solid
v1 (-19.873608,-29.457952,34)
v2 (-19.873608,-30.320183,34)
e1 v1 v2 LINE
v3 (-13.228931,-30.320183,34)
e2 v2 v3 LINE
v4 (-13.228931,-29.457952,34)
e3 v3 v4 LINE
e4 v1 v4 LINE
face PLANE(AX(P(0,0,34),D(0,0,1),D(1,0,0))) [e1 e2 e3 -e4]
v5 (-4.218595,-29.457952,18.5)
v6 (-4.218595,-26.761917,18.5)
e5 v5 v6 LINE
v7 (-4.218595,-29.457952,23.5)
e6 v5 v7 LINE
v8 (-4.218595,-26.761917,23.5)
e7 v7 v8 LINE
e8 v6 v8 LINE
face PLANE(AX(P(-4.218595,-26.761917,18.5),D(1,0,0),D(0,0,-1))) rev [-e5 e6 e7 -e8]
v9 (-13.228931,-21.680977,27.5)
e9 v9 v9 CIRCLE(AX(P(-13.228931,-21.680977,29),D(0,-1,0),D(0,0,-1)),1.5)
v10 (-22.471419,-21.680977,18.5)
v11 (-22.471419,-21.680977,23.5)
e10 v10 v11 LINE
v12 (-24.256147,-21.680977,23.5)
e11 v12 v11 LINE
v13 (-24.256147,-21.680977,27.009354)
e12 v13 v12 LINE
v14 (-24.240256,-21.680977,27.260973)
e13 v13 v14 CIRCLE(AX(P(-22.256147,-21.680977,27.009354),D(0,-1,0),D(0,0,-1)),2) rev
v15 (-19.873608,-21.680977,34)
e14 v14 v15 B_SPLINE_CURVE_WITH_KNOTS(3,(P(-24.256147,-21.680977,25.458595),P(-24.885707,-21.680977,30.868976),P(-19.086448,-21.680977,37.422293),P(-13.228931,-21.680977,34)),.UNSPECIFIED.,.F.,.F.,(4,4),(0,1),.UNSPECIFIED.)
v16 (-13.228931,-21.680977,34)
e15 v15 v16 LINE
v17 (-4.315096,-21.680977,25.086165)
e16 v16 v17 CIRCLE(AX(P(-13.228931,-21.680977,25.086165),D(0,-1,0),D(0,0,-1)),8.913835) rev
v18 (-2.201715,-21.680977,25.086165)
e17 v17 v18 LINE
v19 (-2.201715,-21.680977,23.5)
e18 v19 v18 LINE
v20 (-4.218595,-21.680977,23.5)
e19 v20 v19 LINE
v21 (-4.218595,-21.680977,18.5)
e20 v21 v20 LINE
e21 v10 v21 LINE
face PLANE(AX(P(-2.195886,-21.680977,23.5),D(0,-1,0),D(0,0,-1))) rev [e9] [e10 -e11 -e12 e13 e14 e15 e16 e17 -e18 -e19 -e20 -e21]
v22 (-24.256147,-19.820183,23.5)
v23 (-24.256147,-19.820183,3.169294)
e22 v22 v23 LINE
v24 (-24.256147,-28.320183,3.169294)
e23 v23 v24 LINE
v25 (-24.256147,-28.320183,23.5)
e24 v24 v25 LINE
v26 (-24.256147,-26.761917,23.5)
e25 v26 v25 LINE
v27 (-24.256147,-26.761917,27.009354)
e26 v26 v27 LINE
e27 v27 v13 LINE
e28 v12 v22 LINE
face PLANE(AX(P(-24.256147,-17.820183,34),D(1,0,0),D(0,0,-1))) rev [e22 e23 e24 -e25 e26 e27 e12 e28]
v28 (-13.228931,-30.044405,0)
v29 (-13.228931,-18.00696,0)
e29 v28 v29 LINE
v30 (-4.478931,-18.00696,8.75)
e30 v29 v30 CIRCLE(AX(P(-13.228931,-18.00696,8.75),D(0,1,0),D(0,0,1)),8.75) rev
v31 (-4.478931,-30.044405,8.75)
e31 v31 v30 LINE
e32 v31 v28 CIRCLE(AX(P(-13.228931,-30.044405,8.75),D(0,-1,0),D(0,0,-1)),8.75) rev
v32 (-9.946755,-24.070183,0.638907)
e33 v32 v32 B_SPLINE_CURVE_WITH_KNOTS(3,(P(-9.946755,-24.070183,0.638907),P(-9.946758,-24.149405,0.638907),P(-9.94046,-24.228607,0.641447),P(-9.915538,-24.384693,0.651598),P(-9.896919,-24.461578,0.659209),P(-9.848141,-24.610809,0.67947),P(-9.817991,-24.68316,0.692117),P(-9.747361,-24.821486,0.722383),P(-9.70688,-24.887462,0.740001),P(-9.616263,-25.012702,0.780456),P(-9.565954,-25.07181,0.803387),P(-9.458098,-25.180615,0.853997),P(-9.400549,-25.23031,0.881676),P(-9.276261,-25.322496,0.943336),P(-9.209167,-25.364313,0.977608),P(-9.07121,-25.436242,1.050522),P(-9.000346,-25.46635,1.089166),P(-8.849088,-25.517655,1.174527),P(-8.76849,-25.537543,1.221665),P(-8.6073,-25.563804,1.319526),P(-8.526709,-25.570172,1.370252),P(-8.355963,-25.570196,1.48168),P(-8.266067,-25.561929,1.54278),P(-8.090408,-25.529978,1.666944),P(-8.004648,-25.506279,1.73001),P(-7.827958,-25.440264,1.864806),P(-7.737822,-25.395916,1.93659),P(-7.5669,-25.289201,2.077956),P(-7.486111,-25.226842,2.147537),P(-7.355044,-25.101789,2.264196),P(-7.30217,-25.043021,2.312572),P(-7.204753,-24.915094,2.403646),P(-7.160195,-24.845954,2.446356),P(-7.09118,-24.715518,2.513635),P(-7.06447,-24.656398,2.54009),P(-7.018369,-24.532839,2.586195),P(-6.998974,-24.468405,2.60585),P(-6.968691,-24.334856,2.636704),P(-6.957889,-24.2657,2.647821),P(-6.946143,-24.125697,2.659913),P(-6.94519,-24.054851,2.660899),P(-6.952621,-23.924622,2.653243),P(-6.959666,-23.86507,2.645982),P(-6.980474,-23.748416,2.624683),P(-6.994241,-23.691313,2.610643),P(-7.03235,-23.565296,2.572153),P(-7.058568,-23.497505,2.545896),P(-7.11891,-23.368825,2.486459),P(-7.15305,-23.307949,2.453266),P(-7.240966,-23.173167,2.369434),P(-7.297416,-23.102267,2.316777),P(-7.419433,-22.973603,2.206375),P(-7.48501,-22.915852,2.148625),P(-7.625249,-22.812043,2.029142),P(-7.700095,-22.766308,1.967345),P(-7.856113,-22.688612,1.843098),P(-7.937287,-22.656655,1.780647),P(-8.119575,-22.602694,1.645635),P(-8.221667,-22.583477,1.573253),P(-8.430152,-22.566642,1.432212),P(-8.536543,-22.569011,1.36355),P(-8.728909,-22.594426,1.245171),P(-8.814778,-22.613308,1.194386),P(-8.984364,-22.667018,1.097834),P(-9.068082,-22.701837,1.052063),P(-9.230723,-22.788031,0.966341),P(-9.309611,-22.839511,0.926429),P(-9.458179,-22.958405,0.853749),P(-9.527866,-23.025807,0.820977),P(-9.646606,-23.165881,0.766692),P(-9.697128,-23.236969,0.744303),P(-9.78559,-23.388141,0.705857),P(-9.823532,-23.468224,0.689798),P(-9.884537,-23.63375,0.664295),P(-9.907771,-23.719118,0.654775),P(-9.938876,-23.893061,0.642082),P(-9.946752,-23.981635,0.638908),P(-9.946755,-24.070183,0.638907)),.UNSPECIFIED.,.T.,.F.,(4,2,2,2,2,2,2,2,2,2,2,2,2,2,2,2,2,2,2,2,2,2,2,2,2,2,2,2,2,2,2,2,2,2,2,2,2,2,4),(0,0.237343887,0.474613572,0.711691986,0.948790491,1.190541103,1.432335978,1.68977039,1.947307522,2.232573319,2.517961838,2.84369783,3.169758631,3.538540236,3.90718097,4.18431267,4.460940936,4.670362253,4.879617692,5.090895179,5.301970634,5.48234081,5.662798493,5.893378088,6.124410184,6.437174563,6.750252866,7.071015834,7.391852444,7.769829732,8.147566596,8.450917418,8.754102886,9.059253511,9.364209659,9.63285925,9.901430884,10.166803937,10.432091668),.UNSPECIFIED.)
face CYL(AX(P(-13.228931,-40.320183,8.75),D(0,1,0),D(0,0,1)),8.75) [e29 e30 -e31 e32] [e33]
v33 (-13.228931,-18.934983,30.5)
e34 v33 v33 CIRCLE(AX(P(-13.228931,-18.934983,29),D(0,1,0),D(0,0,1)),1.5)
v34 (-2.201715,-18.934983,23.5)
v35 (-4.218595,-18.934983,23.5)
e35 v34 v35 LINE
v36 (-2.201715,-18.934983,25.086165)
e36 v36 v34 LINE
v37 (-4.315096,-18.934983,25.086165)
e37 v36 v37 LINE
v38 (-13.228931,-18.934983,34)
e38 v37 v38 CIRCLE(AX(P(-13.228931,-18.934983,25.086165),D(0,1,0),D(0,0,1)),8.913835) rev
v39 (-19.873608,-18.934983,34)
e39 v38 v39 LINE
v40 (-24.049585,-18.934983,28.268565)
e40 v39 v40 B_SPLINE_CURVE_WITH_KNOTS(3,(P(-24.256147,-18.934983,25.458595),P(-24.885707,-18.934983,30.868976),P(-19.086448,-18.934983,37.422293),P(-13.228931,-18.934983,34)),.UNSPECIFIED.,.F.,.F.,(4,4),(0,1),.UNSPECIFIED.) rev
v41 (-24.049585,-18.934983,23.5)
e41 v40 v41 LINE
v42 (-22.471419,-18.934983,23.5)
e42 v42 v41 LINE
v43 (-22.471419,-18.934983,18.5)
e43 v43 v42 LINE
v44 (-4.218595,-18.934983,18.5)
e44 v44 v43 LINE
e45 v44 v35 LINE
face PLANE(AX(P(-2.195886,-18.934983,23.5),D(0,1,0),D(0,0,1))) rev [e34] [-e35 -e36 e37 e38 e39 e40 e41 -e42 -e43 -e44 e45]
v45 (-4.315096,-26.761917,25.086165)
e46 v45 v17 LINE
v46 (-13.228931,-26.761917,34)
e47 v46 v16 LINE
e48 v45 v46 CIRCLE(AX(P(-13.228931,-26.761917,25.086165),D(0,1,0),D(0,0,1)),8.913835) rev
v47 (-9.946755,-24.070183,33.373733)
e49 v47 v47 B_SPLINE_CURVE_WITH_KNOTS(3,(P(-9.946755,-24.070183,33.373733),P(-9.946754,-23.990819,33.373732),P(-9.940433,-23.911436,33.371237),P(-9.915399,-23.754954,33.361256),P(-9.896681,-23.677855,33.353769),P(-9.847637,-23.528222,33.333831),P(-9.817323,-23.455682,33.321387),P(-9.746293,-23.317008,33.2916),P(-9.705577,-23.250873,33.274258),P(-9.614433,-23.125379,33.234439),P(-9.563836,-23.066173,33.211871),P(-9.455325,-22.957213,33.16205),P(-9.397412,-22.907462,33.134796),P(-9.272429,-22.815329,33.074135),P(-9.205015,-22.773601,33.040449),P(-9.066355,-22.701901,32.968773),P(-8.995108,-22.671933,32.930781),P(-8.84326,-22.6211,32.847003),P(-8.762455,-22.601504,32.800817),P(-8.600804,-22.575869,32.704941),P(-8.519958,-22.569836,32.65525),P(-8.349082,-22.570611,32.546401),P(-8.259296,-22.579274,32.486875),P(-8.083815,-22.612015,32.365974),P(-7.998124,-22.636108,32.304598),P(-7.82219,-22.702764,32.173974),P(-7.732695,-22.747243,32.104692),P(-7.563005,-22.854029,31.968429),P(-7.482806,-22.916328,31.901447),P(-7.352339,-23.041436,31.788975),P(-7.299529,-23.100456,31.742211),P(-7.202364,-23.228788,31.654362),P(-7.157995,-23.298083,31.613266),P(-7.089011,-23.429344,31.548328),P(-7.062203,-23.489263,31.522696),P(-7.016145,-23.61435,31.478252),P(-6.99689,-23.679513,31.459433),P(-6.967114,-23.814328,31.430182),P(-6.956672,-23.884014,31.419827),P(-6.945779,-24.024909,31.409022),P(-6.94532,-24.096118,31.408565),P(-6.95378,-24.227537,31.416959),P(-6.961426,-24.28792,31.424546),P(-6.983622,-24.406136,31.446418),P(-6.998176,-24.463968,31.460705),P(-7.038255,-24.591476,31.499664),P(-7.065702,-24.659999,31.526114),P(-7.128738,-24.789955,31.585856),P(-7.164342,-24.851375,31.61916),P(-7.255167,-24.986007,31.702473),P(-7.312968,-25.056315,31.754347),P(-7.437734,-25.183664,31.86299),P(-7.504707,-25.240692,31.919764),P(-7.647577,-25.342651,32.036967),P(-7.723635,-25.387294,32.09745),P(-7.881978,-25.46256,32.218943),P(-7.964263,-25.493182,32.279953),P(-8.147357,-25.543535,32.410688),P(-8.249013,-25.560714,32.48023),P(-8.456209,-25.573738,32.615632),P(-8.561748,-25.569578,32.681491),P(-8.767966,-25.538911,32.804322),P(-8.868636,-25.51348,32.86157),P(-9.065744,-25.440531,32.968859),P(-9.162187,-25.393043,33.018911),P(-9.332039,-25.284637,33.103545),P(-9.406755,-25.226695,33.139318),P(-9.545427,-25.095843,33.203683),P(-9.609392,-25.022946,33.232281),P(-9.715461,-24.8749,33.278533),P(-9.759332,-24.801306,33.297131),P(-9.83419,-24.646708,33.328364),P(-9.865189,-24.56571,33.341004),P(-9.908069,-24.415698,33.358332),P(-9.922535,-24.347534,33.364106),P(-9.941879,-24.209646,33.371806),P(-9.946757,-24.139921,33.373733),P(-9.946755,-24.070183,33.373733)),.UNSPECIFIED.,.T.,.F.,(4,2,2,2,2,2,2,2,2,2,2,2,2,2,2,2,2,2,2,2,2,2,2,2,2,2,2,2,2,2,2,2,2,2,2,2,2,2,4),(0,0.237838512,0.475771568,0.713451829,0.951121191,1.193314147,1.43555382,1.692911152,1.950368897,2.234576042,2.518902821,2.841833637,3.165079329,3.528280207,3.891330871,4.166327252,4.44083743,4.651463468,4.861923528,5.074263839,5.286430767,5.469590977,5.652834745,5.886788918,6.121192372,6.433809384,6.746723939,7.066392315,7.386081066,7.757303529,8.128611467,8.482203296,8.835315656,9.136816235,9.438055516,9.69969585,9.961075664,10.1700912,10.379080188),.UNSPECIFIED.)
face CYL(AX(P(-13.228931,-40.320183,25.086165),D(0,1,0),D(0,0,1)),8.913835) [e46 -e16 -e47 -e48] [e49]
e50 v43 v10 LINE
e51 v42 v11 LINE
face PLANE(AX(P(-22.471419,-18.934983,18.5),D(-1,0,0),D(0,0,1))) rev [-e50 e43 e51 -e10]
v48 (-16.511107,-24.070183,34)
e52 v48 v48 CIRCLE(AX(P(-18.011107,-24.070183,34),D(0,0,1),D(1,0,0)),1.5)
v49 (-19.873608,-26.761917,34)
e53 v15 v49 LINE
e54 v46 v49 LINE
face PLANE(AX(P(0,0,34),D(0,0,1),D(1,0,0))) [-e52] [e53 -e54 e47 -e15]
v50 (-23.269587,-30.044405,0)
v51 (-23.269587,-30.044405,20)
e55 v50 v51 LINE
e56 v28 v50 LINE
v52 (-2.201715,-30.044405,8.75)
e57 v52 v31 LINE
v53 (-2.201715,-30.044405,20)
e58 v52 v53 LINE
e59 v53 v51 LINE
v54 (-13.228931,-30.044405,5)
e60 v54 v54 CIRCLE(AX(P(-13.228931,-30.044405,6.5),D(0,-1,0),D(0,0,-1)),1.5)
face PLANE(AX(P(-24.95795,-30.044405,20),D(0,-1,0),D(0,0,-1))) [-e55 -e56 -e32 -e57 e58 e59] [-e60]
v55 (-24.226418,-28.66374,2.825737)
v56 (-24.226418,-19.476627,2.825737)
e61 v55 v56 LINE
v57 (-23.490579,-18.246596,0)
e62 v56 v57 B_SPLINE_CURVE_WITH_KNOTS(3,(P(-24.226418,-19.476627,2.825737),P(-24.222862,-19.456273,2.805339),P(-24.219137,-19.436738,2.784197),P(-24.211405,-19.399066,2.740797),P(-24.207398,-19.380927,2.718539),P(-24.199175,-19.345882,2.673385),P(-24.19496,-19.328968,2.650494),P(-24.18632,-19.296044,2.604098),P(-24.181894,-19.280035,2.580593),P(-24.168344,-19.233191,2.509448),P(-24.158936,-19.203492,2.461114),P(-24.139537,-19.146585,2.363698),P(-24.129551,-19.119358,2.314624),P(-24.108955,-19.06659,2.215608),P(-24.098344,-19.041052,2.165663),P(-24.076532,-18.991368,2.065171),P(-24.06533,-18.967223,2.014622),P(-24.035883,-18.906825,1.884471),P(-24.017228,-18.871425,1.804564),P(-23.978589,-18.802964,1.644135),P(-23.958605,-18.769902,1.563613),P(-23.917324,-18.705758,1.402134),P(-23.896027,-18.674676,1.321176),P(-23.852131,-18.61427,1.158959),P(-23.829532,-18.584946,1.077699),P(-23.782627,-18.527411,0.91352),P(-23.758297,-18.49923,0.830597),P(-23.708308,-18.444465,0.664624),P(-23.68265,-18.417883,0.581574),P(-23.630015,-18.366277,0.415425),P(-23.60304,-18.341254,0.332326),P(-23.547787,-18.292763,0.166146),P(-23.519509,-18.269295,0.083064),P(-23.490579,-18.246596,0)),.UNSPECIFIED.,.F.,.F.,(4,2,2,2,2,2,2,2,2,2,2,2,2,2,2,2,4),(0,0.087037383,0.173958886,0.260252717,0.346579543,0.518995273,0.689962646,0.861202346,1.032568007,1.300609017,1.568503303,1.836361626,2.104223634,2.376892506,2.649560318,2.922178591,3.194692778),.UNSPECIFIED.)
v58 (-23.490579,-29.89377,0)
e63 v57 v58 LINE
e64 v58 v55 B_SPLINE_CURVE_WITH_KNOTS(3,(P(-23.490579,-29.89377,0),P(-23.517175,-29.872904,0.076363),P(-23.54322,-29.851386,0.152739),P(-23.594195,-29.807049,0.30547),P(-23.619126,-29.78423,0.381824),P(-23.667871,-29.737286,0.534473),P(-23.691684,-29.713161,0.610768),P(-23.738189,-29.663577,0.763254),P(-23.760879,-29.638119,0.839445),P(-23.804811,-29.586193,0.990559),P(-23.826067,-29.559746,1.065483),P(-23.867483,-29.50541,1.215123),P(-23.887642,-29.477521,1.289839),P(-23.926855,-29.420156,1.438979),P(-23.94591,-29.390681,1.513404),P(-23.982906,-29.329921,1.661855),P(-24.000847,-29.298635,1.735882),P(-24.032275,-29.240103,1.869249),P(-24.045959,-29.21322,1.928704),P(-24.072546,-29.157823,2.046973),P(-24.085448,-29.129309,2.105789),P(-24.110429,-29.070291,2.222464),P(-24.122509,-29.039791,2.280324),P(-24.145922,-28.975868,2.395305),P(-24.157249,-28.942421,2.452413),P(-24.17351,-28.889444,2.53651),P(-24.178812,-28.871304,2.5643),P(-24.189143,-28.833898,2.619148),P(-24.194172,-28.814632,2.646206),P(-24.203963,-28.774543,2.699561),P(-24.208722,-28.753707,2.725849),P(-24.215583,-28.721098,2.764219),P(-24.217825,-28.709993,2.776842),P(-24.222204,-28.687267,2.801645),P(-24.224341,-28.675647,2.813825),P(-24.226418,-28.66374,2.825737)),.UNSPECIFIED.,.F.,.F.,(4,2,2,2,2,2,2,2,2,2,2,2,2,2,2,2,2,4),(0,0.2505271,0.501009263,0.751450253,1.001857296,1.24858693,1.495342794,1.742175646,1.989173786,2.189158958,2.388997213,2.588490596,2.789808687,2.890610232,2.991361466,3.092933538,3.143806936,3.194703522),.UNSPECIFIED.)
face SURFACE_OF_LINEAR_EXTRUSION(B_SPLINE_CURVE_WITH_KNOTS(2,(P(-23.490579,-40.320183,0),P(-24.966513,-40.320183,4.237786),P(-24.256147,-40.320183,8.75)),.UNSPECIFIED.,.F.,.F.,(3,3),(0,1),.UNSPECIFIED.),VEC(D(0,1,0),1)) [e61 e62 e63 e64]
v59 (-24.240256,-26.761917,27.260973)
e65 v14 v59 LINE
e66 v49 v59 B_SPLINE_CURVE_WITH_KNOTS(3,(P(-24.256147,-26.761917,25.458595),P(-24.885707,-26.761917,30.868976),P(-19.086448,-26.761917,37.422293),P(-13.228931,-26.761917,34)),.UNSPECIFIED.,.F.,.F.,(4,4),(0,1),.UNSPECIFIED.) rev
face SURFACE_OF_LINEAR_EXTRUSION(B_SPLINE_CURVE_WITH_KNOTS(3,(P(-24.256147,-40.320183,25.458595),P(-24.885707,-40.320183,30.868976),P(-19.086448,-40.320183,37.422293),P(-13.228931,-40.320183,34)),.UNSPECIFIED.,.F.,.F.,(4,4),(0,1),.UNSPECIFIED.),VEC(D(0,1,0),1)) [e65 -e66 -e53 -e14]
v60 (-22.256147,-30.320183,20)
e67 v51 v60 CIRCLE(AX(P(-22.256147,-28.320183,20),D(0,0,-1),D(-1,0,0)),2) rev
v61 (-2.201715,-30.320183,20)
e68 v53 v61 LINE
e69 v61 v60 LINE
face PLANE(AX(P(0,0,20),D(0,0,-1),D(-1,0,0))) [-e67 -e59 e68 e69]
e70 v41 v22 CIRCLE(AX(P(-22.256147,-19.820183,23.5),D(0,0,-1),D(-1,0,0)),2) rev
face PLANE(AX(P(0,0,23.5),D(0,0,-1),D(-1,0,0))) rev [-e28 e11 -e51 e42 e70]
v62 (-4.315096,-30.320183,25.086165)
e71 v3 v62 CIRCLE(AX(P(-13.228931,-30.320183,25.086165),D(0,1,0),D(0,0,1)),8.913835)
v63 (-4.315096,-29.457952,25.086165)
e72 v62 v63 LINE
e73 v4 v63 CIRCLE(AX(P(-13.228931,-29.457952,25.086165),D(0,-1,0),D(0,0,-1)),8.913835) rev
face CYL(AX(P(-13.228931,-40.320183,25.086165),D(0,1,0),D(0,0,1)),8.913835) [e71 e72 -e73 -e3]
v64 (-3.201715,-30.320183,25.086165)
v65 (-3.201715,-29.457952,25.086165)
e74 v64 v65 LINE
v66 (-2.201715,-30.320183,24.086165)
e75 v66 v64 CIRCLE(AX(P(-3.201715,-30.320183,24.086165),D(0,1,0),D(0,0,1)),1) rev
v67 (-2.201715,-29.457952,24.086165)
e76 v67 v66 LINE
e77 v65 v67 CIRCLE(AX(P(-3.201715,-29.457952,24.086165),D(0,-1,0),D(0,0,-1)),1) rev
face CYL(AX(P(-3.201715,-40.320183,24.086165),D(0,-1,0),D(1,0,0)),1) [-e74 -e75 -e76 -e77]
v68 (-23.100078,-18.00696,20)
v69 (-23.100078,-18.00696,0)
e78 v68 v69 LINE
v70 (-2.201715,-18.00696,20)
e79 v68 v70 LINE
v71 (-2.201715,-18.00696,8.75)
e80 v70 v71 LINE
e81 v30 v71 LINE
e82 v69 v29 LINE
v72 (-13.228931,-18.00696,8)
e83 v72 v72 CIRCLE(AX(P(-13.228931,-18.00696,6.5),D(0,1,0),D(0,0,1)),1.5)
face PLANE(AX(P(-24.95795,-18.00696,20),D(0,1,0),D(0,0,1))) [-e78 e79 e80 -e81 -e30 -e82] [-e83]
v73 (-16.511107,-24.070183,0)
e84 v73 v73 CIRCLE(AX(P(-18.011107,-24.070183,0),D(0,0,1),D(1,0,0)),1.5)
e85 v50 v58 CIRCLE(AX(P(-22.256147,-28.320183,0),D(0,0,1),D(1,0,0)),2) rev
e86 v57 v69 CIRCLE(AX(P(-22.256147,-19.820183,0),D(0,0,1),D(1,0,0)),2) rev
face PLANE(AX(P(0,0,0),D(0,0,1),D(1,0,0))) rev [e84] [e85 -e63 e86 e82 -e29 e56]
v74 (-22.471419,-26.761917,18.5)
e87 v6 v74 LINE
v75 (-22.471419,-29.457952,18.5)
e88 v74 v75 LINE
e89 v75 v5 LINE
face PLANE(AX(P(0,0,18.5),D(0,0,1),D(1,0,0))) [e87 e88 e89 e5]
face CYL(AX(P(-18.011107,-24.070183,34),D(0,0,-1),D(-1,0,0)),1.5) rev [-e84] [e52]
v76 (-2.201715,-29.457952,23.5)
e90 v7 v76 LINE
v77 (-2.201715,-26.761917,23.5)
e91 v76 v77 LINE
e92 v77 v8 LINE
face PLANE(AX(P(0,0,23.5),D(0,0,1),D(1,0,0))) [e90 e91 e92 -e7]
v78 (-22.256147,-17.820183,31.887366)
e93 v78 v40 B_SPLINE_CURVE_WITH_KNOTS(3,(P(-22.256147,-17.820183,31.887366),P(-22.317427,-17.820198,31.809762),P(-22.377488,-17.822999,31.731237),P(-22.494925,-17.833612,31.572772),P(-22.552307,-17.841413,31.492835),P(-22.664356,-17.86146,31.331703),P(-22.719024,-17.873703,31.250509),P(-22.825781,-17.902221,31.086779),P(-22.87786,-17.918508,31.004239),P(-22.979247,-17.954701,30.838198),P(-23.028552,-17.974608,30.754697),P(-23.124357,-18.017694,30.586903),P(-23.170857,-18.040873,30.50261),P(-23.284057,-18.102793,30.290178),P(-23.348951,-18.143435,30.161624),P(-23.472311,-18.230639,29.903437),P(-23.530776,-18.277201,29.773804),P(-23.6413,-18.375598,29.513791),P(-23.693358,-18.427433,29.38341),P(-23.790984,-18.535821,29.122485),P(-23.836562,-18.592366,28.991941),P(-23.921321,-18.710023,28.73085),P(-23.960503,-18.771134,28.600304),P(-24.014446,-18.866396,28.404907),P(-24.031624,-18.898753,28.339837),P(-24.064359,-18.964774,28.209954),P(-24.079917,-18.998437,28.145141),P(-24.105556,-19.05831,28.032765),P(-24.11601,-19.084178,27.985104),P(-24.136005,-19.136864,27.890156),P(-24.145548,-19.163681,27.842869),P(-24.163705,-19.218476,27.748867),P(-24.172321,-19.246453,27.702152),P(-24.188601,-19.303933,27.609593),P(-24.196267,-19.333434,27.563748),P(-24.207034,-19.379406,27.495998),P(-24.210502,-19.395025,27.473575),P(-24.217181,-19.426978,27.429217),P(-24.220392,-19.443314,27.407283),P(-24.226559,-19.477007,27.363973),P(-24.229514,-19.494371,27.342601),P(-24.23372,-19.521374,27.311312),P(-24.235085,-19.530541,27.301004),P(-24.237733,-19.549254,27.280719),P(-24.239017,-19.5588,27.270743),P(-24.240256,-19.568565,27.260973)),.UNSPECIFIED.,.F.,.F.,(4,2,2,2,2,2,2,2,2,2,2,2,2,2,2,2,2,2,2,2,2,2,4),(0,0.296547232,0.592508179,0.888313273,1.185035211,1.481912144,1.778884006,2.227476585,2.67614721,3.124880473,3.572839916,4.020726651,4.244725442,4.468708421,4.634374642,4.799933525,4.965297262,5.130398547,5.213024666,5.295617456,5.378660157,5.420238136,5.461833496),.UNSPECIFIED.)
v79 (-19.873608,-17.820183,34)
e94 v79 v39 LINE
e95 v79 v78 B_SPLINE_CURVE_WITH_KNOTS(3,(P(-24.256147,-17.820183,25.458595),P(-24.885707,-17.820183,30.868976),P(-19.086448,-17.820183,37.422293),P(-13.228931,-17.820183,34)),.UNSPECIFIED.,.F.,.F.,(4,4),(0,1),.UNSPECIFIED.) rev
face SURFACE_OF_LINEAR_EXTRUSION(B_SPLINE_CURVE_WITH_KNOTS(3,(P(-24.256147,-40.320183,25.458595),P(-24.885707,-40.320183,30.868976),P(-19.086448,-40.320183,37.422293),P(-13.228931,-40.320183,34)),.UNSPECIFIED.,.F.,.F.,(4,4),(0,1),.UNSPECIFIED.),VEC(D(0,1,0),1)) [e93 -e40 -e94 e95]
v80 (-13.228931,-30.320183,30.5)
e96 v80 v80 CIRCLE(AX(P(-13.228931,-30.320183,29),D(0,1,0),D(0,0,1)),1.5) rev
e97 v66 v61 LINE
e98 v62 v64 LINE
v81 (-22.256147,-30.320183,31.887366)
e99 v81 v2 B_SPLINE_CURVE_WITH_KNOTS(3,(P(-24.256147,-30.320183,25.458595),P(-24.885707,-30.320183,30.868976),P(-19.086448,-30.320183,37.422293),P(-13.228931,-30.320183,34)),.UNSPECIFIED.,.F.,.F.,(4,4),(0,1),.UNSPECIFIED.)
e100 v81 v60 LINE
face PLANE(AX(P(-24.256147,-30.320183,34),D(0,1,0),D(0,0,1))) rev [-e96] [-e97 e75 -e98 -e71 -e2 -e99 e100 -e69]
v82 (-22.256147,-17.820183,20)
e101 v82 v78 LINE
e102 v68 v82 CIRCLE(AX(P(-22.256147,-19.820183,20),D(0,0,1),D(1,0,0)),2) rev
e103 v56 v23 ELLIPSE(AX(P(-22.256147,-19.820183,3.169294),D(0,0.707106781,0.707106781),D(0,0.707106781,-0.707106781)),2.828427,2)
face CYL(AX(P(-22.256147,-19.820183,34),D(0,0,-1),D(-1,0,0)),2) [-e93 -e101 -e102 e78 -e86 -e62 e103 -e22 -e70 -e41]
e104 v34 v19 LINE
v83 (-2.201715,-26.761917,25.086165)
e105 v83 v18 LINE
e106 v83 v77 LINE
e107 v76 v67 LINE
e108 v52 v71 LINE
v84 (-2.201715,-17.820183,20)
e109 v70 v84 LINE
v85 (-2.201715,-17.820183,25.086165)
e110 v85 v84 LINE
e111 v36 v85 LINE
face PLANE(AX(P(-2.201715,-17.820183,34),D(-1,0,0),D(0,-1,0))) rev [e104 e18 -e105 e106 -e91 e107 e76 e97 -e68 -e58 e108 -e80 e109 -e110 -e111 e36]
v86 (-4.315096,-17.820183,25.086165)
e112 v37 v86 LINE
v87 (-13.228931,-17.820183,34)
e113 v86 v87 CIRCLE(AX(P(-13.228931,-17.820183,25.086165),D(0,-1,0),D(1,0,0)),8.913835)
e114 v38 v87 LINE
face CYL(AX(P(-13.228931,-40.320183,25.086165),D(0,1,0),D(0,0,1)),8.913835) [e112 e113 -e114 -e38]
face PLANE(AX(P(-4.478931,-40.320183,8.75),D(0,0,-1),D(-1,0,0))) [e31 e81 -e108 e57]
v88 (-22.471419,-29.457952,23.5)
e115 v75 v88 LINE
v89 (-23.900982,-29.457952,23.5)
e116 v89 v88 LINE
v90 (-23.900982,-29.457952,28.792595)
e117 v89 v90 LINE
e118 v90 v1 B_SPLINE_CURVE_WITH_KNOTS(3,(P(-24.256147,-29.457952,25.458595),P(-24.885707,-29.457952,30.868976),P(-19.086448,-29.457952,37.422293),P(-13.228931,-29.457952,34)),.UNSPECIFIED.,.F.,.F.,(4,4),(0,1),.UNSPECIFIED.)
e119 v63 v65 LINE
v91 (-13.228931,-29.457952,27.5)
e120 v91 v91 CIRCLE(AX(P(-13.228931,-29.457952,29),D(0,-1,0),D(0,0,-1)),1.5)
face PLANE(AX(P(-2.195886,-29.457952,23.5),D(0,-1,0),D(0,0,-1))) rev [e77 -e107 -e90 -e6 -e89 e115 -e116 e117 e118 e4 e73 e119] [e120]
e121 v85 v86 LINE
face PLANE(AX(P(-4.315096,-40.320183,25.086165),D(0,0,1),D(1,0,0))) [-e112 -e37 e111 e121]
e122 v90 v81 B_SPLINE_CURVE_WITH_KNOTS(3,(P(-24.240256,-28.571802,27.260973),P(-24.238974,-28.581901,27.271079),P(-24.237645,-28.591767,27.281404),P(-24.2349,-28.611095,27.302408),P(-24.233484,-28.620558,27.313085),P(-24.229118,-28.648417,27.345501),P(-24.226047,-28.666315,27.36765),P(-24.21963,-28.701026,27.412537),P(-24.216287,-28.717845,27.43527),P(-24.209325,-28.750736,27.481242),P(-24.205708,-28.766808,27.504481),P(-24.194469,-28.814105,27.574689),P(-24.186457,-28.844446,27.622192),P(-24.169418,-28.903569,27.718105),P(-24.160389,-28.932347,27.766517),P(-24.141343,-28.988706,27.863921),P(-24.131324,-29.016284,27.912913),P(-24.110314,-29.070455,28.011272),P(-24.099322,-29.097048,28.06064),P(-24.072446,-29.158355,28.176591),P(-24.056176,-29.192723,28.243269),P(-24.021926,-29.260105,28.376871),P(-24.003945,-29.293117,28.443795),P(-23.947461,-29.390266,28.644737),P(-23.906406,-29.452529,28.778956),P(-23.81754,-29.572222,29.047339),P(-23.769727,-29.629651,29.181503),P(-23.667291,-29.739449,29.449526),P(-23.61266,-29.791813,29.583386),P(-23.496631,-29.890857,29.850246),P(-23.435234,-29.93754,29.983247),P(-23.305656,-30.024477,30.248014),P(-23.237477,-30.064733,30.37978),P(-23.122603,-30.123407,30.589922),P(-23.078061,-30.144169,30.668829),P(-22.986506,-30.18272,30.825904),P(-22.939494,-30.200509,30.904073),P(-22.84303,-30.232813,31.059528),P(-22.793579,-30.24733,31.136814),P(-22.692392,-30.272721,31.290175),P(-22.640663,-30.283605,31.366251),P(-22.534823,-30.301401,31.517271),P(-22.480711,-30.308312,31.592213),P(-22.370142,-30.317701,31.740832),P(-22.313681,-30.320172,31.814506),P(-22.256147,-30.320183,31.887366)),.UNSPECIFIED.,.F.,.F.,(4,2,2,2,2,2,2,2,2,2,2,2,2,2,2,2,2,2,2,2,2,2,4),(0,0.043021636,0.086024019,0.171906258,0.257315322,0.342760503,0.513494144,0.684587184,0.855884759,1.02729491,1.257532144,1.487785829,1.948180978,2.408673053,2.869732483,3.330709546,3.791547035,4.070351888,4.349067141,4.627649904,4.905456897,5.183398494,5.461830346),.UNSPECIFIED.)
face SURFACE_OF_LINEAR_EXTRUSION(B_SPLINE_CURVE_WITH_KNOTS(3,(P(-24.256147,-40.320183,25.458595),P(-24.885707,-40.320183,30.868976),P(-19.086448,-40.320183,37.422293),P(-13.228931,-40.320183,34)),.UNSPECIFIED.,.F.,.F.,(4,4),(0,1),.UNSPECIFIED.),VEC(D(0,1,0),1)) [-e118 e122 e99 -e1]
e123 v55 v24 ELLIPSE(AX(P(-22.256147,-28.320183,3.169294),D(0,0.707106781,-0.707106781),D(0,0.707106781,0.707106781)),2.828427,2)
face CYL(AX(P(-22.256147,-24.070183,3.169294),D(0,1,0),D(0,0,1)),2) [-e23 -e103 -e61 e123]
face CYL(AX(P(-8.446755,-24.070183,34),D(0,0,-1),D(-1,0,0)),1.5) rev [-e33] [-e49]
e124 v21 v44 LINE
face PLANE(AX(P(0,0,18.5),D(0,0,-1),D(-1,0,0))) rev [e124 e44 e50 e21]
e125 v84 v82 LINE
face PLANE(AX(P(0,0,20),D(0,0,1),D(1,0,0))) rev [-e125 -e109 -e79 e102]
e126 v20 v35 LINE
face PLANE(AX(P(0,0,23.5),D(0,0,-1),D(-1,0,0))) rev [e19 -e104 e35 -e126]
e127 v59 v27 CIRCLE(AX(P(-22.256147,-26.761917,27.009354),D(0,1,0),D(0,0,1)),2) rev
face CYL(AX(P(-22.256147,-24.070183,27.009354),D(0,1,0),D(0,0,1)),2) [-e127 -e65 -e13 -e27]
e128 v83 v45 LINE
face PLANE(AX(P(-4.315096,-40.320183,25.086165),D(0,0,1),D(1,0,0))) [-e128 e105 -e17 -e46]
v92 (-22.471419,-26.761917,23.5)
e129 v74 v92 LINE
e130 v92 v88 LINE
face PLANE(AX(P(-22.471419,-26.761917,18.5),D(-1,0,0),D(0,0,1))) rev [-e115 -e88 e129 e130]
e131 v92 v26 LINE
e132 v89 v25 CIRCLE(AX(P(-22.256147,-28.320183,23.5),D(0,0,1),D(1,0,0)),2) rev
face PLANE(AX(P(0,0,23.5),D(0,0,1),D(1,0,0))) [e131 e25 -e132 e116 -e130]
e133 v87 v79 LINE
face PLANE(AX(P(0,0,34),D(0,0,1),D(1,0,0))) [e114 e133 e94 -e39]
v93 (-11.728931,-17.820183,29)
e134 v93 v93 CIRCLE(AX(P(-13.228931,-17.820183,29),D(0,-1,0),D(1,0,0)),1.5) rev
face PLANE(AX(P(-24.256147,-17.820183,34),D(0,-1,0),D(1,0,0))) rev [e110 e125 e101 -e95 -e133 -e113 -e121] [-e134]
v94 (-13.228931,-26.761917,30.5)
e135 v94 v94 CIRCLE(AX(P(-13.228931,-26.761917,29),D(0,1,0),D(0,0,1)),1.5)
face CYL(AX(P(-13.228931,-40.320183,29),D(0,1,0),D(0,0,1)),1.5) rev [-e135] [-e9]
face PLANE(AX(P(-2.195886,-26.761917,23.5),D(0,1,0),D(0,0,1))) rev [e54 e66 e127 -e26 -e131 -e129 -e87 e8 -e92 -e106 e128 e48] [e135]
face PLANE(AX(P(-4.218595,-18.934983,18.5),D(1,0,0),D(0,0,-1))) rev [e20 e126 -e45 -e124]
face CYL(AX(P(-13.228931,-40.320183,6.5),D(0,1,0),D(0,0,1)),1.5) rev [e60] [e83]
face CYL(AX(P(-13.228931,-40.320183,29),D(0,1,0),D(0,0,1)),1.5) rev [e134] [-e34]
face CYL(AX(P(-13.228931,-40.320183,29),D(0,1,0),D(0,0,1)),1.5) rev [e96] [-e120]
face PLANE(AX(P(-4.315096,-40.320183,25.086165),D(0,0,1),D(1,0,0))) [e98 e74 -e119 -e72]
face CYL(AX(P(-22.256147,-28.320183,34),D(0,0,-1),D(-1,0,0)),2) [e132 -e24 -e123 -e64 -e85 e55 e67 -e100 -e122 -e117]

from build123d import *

# Parameters (mm, degrees)
SKETCH1_W               = 22.054431489
SKETCH1_H               = 12.5
BOSS_EXTRUDE1_DEPTH     = 34
CUT_EXTRUDE1_DEPTH      = 10
CUT_EXTRUDE1_DEPTH_BACK = 15
SKETCH2_R               = 1.5
FILLET3_R               = 2
SKETCH5_R               = 1.5
CUT_EXTRUDE4_DEPTH      = 52.610795679
SKETCH16_W              = 22.066089364
SKETCH16_H              = 2.745994046
SKETCH16_H_2            = 2.696035541
CUT_EXTRUDE6_DEPTH      = 14.5
FILLET4_R               = 1
SKETCH17_W              = 18.252824183
SKETCH17_H              = 2.745994046
SKETCH17_H_2            = 2.696035541
CUT_EXTRUDE7_DEPTH      = 5
SKETCH18_W              = 24.333833062
SKETCH18_H              = 0.605314718
SKETCH18_H_2            = 0.725933663
CUT_EXTRUDE8_DEPTH      = 20


with BuildPart() as part:
    # Sketch1 → Boss-Extrude1 (new body)
    with BuildSketch(Plane.XY):
        with Locations((-13.228930986, -24.070183414)):
            Rectangle(SKETCH1_W, SKETCH1_H)
    extrude(amount=BOSS_EXTRUDE1_DEPTH)

    # Sketch2 → Cut-Extrude1 (cut, two sides: drawn at the far end of the back side and taken through both)
    with BuildSketch(Plane.XZ.offset(30.320183414).offset(-CUT_EXTRUDE1_DEPTH_BACK)):
        with Locations(Location((-13.228930986, 6.5, 0), (0, 0, 90))):
            Circle(SKETCH2_R)
        with Locations(Location((-13.228930986, 29, 0), (0, 0, 90))):
            Circle(SKETCH2_R)
        with BuildLine():
            Line((-4.315096089, 25.086165103), (-2.201715242, 25.086165103))
            add(Edge.make_bspline(
                [(-24.256146731, 25.458595261), (-35.656041951, 36.540332573), (-13.006901701, 52.285060009), (9.32231541, 36.338450422), (-2.201715242, 25.086165103)],
                knots=[0, 0, 0, 0, 0.496841919, 1, 1, 1, 1], degree=3))
            add(Edge.make_bspline(
                [(-13.228930986, 34), (-19.086447972, 37.422293362), (-24.885707195, 30.868976401), (-24.256146731, 25.458595261)],
                knots=[0, 0, 0, 0, 1, 1, 1, 1], degree=3))
            ThreePointArc((-13.228930986, 34), (-6.925897884, 31.389198205), (-4.315096089, 25.086165103))
        make_face()
        with BuildLine():
            Line((-4.478930986, 8.75), (-2.201715242, 8.75))
            add(Edge.make_bspline(
                [(-2.201715242, 8.75), (5.39210746, 3.880294823), (-0.777052631, -4.523329032), (-17.174300591, -10.623347238), (-34.821400648, -0.026005424), (-24.256146731, 8.75)],
                knots=[0, 0, 0, 0, 0.283272691, 0.504244858, 1, 1, 1, 1], degree=3))
            add(Edge.make_bspline(
                [(-23.490579314, 0), (-24.966512963, 4.237786421), (-24.256146731, 8.75)],
                knots=[0, 0, 0, 1, 1, 1], degree=2))
            Line((-23.490579314, 0), (-13.228930986, 0))
            ThreePointArc((-13.228930986, 0), (-7.041746651, 2.562815665), (-4.478930986, 8.75))
        make_face()
    extrude(amount=CUT_EXTRUDE1_DEPTH + CUT_EXTRUDE1_DEPTH_BACK, mode=Mode.SUBTRACT)

    # Fillet3
    # the kernel refuses this fillet: 2 mm, written as the material it takes off along each edge
    with BuildSketch(Plane(origin=(-24.256146731, -17.820183414, -1.998495188), x_dir=(1, 0, 0), z_dir=(0, 0, 1))) as fillet3_piece_1:
        with BuildLine():
            CenterArc((FILLET3_R, -FILLET3_R), FILLET3_R, 90, 90)
            Line((0, -FILLET3_R), (0, 0))
            Line((0, 0), (FILLET3_R, 0))
        make_face()
    extrude(amount=34.125242274, mode=Mode.SUBTRACT)
    with BuildSketch(Plane(origin=(-24.256146731, -30.320183414, -1.998495188), x_dir=(1, 0, 0), z_dir=(0, 0, 1))) as fillet3_piece_2:
        with BuildLine():
            CenterArc((FILLET3_R, FILLET3_R), FILLET3_R, 180, 90)
            Line((0, FILLET3_R), (0, 0))
            Line((0, 0), (FILLET3_R, 0))
        make_face()
    extrude(amount=34.125242274, mode=Mode.SUBTRACT)
    with BuildSketch(Plane(origin=(-24.256146731, -17.374523396, 3.001504812), x_dir=(0.1667681859257429, 1.4874647964432132e-15, -0.9859961319209304), z_dir=(0, -1, 0))) as fillet3_piece_3:
        with BuildLine():
            CenterArc((0.168096911, 1.999974157), FILLET3_R, 260.400032587, 9.891234523)
            Line((-0.165439461, 0.027981894), (0, 0))
            ThreePointArc((0, 0), (0.089132004, -0.000226606), (0.178264007, 0))
        make_face()
    extrude(amount=13.331280444, mode=Mode.SUBTRACT)
    with BuildSketch(Plane(origin=(-24.256146731, -17.482274803, 27.126747086), x_dir=(0.11756979569322837, -1.02728794699617e-15, 0.9930646218351818), z_dir=(0, -1, 0))) as fillet3_piece_4:
        with BuildLine():
            CenterArc((0.118560979, -1.999931088), FILLET3_R, 89.524368939, 7.227500304)
            Line((-0.116578613, -0.013801845), (0, 0))
            ThreePointArc((0, 0), (0.067581725, 0.000281106), (0.135163444, 0))
        make_face()
    extrude(amount=13.131401648, mode=Mode.SUBTRACT)

    # Sketch5 → Cut-Extrude4 (cut, through all)
    with BuildSketch(Plane.XY):
        with Locations((-18.011106811, -24.070183414)):
            Circle(SKETCH5_R)
        with Locations(Location((-8.446755162, -24.070183414, 0), (0, 0, 180))):
            Circle(SKETCH5_R)
    extrude(amount=CUT_EXTRUDE4_DEPTH, mode=Mode.SUBTRACT)

    # Sketch16 → Cut-Extrude6 (cut)
    with BuildSketch(Plane.XY.offset(38)):
        with Locations((-13.228930985, -20.307980077)):
            Rectangle(SKETCH16_W, SKETCH16_H)
        with Locations((-13.228930985, -28.109934669)):
            Rectangle(SKETCH16_W, SKETCH16_H_2)
    extrude(amount=-CUT_EXTRUDE6_DEPTH, mode=Mode.SUBTRACT)

    # Fillet4
    fillet4_edges = [part.edges().sort_by_distance(p)[0] for p in [
        (-2.201715242, -29.889067926, 25.086165103),
    ]]
    fillet(fillet4_edges, radius=FILLET4_R)

    # Sketch17 → Cut-Extrude7 (cut)
    with BuildSketch(Plane.XY.offset(23.5)):
        with Locations((-13.345007216, -20.307980077)):
            Rectangle(SKETCH17_W, SKETCH17_H)
        with Locations((-13.345007216, -28.109934669)):
            Rectangle(SKETCH17_W, SKETCH17_H_2)
    extrude(amount=-CUT_EXTRUDE7_DEPTH, mode=Mode.SUBTRACT)

    # Sketch18 → Cut-Extrude8 (cut)
    with BuildSketch(Plane.XY):
        with Locations((-12.791033736, -17.704302546)):
            Rectangle(SKETCH18_W, SKETCH18_H)
        with Locations((-12.791033736, -30.407371646)):
            Rectangle(SKETCH18_W, SKETCH18_H_2)
    extrude(amount=CUT_EXTRUDE8_DEPTH, mode=Mode.SUBTRACT)


solid = part.part
